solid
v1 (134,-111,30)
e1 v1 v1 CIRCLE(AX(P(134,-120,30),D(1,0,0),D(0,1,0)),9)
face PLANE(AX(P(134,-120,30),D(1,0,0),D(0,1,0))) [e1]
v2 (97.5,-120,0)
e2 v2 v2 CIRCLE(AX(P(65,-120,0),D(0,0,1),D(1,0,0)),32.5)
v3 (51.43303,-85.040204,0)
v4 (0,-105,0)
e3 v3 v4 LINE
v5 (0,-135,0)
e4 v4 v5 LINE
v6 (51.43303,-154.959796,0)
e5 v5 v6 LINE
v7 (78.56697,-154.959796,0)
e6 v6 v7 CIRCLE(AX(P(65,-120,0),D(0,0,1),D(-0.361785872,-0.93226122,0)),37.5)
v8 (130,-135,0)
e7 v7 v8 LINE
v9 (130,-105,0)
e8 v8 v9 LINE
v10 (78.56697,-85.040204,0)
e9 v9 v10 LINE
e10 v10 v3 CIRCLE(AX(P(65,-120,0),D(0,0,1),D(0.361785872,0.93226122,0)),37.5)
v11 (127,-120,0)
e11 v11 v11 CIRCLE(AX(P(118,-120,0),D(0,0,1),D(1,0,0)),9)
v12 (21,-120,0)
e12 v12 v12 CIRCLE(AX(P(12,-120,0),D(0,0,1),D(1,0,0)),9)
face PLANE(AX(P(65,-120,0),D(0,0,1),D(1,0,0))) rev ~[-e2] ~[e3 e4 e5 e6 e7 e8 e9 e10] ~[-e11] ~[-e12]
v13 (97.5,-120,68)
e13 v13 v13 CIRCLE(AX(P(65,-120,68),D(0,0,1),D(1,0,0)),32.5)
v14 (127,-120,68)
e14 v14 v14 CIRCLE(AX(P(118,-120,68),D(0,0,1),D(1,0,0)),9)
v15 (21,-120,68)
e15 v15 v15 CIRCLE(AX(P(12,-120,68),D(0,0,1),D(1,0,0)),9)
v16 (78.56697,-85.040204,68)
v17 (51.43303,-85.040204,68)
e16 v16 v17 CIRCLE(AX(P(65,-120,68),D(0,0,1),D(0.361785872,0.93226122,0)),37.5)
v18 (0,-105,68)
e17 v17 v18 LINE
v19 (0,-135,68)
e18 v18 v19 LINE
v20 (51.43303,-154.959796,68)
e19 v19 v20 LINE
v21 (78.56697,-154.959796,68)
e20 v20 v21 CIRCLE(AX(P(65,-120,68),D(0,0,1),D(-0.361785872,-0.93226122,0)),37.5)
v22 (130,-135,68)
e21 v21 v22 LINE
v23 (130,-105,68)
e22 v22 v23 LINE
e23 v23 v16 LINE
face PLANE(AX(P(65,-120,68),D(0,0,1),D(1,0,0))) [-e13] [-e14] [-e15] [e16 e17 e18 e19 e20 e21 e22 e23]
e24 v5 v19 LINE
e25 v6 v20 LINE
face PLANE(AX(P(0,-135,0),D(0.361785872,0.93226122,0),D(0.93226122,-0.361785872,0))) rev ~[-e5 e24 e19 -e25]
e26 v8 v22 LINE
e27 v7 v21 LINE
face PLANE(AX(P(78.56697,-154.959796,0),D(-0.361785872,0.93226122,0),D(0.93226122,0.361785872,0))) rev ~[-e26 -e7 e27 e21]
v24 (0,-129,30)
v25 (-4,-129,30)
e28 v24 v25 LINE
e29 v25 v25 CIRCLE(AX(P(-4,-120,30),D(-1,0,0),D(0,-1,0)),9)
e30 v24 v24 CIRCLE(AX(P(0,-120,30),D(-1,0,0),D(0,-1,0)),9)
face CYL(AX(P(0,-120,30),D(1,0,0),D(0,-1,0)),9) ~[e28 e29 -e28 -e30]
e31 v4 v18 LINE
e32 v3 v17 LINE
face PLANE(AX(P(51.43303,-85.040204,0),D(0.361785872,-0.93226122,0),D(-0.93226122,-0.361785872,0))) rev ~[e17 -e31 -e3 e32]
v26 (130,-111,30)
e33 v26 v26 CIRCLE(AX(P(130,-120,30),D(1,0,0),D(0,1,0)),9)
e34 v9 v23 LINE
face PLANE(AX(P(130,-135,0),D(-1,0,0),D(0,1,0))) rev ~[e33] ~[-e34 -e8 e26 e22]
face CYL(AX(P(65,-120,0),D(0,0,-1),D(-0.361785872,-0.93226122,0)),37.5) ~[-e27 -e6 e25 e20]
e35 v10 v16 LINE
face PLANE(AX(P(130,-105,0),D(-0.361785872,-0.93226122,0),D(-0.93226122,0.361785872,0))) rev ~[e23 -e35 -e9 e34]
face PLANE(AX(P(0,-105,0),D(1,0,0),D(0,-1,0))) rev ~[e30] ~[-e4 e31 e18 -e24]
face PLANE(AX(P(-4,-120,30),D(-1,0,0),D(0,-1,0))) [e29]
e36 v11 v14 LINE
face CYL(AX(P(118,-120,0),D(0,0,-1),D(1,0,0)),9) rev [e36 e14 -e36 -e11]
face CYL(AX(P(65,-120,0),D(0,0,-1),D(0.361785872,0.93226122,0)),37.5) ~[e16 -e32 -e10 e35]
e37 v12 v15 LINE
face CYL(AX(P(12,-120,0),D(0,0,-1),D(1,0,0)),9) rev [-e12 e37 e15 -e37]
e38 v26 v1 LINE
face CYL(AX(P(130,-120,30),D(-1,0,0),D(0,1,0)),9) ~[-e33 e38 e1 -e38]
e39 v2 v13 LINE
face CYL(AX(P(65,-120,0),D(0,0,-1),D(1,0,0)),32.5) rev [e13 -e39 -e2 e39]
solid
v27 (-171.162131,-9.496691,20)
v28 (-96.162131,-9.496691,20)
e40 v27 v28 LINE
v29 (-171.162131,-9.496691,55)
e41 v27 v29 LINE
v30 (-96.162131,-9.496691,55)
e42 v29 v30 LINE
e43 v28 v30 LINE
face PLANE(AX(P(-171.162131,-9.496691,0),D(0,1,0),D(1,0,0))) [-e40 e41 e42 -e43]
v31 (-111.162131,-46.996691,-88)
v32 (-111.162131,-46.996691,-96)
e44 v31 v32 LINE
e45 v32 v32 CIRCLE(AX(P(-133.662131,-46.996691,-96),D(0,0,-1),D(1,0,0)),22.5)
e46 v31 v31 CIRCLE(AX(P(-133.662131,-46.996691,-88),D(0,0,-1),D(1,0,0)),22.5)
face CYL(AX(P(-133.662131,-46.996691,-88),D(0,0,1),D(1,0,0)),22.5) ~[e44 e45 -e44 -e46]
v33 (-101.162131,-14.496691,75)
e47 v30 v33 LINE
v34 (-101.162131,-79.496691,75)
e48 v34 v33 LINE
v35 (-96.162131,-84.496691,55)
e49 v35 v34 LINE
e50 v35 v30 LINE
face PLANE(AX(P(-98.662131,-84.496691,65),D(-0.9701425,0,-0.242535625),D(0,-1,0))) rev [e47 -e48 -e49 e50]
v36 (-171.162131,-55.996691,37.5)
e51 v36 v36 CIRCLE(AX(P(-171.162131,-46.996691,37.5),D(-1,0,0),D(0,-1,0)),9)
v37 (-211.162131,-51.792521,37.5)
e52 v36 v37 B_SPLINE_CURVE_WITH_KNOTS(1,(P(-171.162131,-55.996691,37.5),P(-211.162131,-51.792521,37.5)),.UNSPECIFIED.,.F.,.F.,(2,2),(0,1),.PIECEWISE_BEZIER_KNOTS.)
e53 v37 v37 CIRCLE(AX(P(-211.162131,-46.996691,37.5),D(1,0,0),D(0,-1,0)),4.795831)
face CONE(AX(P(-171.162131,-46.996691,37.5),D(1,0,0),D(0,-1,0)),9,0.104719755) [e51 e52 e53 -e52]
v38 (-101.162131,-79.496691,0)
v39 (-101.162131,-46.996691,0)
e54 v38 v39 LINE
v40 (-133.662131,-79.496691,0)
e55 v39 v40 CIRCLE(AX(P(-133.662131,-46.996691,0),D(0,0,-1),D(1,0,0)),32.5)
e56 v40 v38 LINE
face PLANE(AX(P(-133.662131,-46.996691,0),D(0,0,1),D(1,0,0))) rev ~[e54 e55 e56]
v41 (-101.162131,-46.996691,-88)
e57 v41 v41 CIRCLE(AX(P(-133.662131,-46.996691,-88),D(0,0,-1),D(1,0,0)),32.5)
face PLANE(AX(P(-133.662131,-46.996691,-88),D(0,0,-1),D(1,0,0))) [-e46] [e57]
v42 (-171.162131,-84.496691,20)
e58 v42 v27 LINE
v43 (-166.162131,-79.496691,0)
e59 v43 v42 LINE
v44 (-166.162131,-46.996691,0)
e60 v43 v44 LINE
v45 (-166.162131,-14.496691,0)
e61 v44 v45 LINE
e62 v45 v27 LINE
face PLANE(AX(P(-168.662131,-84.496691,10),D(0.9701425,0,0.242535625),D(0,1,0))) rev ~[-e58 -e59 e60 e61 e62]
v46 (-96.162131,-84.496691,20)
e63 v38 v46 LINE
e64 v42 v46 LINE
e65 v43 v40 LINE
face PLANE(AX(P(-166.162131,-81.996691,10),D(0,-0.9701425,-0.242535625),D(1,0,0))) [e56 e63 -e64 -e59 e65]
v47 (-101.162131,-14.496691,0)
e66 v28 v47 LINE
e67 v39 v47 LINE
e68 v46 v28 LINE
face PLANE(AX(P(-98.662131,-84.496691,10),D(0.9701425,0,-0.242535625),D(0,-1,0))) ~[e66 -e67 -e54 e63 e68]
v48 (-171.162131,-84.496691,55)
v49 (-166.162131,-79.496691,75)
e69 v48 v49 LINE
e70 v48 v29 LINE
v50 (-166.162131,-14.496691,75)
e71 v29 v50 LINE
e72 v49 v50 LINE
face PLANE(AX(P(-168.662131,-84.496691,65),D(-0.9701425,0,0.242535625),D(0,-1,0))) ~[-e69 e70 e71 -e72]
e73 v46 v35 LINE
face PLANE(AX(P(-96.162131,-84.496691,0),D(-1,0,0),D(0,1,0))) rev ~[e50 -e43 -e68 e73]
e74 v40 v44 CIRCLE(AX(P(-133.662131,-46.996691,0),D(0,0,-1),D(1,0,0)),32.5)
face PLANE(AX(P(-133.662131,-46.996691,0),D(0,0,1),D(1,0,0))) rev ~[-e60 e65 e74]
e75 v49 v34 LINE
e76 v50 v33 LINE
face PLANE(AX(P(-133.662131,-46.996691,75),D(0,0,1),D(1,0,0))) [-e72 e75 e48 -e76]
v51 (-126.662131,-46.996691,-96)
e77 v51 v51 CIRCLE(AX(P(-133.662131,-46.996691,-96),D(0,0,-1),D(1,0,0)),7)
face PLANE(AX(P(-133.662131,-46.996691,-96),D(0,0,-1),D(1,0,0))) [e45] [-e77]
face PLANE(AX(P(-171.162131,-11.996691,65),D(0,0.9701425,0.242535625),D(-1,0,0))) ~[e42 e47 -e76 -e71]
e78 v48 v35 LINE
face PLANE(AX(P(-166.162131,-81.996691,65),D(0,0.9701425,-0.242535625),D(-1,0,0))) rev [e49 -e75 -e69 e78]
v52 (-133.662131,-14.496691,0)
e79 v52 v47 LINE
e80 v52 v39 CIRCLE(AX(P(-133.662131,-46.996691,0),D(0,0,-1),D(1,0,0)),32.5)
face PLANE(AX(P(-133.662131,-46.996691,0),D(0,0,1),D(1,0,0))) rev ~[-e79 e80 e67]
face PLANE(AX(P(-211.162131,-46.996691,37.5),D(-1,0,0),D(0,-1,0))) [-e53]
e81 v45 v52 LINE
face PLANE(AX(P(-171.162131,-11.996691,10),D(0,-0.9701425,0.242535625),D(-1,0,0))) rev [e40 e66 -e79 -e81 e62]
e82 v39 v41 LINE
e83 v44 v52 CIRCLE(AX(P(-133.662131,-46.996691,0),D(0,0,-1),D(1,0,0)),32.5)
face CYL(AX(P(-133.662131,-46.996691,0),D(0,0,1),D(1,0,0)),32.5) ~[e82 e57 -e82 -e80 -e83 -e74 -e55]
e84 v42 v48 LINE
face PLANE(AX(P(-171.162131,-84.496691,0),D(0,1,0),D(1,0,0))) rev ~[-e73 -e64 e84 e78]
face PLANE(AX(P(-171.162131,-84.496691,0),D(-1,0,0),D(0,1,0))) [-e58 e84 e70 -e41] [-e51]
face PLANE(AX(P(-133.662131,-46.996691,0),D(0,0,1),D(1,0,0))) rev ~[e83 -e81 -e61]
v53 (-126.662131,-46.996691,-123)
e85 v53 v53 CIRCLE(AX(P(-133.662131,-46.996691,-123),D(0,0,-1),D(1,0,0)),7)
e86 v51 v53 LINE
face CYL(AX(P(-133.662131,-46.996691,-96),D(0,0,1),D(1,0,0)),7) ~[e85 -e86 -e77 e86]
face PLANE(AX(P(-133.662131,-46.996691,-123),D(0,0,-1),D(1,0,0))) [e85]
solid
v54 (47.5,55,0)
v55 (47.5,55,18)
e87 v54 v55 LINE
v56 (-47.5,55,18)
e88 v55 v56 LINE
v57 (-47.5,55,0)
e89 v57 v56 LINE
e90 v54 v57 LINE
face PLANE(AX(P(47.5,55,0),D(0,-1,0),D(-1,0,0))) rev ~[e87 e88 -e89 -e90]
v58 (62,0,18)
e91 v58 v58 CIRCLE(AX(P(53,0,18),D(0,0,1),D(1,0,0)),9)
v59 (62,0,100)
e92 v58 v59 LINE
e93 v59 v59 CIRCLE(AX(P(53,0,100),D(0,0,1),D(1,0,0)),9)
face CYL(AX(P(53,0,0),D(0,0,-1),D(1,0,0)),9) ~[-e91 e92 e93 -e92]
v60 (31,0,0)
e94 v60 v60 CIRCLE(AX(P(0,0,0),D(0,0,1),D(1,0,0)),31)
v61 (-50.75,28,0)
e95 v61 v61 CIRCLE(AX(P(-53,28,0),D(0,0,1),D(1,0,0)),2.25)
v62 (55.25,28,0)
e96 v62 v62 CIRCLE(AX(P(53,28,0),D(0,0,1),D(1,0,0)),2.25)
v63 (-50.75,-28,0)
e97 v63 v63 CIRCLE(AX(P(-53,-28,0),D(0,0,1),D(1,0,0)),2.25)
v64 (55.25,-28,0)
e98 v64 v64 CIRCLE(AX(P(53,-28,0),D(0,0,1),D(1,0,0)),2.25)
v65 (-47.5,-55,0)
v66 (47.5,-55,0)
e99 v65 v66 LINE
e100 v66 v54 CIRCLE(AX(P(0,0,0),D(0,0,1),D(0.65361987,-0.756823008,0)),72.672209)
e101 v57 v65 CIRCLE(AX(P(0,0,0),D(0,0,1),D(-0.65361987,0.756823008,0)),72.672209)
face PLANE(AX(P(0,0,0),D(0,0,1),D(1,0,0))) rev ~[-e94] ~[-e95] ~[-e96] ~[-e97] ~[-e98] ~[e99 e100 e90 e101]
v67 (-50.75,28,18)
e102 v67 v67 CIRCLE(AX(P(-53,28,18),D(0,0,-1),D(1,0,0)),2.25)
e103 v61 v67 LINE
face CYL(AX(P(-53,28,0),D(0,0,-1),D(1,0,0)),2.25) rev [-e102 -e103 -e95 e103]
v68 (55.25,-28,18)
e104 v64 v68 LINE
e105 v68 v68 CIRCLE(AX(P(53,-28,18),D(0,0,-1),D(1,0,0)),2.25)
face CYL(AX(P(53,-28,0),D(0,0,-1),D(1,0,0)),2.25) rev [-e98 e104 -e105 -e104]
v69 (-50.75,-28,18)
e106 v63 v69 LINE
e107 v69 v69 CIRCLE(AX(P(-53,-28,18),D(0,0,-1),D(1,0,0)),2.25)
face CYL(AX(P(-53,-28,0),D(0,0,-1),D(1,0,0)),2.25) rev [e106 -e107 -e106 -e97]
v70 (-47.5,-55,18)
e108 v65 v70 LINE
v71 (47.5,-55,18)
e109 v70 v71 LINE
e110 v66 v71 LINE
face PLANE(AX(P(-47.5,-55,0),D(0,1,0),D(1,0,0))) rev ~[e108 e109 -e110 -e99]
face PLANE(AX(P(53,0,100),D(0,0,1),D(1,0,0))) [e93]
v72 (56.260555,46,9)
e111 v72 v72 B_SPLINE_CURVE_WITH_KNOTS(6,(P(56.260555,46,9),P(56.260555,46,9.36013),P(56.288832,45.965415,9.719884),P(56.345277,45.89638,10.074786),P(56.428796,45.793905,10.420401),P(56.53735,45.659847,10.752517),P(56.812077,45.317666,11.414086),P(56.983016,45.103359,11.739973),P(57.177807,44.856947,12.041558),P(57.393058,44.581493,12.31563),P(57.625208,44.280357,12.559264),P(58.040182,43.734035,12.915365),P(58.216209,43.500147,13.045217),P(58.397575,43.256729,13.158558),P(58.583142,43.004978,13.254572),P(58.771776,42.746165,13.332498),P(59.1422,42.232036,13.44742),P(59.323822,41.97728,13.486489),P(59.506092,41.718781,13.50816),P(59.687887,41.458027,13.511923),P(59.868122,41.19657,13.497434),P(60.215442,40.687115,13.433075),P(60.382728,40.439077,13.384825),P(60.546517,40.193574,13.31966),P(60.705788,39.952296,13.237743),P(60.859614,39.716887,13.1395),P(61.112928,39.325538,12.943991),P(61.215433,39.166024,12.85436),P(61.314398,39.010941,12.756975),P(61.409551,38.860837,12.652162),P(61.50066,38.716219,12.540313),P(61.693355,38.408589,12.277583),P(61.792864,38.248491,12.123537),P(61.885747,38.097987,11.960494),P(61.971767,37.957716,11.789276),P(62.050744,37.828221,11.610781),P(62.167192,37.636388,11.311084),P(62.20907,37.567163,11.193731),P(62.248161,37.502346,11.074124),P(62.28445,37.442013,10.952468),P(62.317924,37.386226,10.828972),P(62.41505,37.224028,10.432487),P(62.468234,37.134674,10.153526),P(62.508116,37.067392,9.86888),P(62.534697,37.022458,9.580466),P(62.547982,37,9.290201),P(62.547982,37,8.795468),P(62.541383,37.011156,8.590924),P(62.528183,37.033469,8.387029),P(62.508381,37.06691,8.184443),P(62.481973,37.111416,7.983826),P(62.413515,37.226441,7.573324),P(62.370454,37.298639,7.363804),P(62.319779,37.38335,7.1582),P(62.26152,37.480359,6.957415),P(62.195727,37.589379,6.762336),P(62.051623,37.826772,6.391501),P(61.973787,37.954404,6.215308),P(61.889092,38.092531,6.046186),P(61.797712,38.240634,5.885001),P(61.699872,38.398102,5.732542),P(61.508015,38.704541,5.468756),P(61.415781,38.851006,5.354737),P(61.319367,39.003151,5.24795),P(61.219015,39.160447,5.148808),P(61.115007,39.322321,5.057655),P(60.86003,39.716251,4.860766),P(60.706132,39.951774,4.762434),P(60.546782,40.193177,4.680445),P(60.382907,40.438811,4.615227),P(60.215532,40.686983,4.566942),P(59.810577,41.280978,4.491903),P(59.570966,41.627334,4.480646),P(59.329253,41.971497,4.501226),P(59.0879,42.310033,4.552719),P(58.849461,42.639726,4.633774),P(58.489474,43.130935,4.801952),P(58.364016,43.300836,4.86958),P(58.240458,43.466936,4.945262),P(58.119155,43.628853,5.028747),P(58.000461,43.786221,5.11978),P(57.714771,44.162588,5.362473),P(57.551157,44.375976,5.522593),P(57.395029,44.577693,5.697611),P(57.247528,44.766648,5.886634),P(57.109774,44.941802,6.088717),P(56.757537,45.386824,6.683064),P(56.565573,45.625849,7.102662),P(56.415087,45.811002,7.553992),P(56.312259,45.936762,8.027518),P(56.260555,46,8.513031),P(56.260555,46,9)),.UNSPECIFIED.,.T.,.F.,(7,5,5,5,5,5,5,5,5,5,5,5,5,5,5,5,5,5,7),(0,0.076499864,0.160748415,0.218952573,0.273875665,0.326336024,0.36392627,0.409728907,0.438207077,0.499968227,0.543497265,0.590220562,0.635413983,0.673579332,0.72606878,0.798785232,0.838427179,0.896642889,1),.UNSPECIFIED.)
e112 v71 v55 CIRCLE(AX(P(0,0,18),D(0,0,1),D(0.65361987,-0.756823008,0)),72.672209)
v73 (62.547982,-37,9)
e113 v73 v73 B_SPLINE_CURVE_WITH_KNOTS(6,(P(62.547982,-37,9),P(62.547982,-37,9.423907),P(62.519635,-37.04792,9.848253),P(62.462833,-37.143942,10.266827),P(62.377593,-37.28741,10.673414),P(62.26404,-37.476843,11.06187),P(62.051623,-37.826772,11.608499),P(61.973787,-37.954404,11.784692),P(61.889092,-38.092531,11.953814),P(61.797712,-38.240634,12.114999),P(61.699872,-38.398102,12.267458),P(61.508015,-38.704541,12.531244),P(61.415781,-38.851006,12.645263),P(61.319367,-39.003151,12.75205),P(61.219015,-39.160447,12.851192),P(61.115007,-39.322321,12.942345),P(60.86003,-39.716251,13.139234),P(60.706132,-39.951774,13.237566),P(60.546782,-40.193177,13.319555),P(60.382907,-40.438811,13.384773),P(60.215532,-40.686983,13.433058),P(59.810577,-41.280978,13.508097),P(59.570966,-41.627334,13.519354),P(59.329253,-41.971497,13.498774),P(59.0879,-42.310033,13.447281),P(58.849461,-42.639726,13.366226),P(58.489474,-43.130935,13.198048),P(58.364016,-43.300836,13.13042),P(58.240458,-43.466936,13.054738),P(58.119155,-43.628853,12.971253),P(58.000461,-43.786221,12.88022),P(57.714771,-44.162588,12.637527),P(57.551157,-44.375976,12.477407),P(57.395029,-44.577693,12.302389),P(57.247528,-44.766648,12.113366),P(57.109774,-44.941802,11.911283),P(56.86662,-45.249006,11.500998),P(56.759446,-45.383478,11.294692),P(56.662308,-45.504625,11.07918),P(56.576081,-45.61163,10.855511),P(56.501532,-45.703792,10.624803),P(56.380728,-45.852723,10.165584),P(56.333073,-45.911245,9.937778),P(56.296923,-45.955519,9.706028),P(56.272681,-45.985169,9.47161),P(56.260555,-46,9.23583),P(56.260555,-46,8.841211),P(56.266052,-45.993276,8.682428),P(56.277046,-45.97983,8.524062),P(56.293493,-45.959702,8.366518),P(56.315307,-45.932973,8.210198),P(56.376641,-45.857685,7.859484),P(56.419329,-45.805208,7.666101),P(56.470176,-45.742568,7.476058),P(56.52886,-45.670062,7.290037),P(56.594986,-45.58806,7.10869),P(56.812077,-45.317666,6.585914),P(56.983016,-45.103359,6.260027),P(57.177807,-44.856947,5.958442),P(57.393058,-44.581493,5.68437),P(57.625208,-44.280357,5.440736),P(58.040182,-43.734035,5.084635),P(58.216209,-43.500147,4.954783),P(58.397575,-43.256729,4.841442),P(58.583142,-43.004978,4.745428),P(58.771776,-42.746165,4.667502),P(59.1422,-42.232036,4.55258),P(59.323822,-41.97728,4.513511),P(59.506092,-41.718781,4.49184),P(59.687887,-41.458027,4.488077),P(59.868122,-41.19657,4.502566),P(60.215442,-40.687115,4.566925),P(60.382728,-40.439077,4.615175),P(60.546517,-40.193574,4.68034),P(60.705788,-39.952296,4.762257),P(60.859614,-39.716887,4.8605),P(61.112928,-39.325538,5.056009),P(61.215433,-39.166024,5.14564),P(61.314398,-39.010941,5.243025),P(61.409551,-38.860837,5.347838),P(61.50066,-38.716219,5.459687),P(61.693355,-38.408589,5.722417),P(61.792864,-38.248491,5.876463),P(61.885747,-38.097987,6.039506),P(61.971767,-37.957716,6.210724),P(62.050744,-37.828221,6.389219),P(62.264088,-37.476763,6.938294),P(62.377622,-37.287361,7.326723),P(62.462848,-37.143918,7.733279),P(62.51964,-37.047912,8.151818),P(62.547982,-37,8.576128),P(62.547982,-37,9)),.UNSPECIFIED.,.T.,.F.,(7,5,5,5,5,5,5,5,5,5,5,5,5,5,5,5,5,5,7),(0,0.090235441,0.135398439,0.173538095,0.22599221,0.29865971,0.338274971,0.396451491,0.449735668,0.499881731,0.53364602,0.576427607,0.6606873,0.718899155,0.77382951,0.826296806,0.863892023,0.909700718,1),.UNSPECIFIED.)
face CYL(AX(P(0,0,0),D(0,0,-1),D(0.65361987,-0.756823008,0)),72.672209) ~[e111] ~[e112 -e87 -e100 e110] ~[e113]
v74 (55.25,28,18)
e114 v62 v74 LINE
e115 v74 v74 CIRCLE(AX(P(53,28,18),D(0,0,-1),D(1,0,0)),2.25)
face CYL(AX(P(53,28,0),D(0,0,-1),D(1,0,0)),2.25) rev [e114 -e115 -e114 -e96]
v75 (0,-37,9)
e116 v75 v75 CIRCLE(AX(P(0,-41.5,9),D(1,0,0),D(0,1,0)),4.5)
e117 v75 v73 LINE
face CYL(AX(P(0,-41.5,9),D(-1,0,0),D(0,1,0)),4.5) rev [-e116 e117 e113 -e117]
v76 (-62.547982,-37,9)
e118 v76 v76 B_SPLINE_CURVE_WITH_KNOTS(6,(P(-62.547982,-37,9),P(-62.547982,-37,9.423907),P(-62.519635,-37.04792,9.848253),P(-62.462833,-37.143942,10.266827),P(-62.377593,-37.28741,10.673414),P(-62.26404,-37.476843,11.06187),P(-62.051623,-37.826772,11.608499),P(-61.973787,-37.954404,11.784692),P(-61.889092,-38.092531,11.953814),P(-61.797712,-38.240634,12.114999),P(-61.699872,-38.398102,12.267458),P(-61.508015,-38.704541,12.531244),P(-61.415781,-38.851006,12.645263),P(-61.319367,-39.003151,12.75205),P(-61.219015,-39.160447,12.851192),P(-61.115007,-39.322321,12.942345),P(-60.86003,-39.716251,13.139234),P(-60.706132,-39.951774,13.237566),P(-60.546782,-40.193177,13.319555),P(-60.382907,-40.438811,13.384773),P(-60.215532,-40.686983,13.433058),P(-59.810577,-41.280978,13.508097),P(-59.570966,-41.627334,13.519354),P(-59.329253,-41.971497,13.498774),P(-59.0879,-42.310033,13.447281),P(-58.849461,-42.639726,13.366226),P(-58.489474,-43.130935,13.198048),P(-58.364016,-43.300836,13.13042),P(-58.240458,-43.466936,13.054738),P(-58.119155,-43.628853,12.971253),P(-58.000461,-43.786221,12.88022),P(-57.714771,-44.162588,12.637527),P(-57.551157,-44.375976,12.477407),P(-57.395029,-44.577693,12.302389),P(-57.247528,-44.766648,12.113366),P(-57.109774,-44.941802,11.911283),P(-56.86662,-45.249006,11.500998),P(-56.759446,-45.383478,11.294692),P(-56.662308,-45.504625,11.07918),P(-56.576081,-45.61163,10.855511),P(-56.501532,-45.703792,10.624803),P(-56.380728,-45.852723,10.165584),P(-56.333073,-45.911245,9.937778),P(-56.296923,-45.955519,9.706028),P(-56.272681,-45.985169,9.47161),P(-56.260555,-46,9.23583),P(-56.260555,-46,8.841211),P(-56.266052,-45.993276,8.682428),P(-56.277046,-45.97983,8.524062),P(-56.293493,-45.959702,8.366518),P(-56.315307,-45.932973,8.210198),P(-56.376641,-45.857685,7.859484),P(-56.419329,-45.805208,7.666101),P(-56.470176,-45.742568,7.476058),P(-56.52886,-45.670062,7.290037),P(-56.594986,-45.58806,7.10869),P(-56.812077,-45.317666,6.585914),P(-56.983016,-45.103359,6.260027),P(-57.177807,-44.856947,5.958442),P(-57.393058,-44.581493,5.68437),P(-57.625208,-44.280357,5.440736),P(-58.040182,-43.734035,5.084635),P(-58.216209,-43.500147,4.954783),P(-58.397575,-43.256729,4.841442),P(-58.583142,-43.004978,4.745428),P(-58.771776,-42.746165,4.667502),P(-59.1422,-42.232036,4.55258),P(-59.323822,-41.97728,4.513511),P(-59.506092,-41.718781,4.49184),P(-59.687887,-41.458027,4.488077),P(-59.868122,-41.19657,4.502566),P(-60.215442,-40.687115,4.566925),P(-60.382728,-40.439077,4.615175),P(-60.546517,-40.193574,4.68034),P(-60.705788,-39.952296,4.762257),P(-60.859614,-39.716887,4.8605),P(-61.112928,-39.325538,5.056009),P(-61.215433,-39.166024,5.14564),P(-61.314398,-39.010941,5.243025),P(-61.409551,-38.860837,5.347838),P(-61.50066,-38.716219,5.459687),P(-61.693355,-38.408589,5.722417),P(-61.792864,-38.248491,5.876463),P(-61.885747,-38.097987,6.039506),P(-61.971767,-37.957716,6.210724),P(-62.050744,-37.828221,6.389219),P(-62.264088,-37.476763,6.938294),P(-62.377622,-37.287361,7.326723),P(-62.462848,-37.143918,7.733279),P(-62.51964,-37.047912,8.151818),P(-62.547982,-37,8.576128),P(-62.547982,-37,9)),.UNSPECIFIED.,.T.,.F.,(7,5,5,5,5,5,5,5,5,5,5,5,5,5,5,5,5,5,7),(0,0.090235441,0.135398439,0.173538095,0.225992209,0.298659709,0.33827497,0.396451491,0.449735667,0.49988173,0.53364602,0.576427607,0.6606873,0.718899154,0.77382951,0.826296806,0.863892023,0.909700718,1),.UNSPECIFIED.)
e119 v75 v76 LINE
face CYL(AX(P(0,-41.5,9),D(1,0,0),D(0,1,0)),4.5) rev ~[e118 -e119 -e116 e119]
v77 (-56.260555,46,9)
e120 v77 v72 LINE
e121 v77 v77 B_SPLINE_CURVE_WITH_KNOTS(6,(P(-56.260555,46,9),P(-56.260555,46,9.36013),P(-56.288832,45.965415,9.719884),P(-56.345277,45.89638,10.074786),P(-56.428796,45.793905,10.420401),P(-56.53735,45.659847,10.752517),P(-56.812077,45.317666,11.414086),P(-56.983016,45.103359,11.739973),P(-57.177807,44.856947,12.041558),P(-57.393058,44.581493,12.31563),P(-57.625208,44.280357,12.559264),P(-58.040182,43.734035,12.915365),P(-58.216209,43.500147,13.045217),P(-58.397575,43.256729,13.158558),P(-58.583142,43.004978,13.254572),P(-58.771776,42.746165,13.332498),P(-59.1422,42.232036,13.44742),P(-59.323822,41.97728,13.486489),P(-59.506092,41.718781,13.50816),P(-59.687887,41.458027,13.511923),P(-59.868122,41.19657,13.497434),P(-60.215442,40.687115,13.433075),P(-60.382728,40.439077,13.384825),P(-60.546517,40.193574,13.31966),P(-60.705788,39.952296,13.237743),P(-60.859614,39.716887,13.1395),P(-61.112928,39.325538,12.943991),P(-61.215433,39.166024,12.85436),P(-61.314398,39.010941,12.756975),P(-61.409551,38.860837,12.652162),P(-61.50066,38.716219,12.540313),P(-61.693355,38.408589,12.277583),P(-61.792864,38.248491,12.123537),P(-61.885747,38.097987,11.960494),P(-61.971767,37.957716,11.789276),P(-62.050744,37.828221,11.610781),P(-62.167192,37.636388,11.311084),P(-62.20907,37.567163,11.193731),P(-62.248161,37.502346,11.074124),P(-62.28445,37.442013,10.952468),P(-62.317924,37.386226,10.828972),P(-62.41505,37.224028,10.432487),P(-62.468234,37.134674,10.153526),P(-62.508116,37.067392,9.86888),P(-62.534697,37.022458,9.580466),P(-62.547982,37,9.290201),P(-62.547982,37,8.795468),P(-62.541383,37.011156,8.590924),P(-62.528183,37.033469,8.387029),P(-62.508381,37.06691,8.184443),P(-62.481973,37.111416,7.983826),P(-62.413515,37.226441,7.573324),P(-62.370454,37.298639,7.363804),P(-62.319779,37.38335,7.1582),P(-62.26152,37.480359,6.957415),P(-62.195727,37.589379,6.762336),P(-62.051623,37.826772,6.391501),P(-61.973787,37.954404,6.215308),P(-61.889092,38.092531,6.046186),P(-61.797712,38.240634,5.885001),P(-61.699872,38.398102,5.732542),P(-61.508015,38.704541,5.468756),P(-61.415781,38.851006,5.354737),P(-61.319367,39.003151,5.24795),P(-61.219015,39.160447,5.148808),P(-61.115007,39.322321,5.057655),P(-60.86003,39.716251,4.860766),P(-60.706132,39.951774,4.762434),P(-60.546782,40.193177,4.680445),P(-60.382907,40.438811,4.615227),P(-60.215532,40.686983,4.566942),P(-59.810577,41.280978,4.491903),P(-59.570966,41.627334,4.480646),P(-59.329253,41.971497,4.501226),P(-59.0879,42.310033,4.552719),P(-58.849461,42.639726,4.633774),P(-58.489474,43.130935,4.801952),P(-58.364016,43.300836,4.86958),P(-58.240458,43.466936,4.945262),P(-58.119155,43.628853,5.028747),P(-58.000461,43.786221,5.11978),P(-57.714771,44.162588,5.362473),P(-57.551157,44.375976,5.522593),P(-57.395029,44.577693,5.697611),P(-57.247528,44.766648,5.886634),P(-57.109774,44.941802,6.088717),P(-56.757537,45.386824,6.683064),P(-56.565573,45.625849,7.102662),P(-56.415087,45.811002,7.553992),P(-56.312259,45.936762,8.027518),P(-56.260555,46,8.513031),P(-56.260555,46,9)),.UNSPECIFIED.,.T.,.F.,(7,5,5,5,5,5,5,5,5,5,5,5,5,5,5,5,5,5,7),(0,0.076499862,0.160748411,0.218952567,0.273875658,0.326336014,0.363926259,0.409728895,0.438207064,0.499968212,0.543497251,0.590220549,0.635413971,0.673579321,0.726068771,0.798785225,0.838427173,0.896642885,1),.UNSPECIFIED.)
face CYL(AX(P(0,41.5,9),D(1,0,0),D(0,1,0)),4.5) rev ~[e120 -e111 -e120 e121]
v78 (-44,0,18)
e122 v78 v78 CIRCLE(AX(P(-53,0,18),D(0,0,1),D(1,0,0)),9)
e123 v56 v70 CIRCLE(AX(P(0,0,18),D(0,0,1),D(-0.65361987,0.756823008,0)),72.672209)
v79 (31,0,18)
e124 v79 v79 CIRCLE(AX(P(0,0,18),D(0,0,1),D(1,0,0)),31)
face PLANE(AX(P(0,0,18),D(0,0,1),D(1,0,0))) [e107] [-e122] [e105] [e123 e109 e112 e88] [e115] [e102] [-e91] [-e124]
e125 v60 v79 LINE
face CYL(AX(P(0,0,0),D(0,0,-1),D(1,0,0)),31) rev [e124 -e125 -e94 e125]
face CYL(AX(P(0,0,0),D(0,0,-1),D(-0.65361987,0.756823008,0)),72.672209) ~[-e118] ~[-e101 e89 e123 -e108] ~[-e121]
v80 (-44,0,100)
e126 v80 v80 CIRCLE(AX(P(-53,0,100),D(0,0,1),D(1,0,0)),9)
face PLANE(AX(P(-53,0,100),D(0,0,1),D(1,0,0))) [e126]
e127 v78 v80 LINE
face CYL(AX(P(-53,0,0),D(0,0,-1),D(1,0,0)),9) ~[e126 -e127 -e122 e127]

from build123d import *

# Parameters (mm, degrees)
F0_R         = 9
F0_R_2       = 31
F1_DEPTH     = 18
F2_DEPTH     = 100
F3_R         = 4.5
F4_DEPTH     = 100
F5_R         = 9
F5_R_2       = 32.5
F6_DEPTH     = 68
F7_R         = 9
F8_DEPTH     = 4
F9_R         = 9
F10_DEPTH    = 4
F16_W        = 75
F16_H        = 75
F17_DEPTH    = 75
F18_SIZE2    = 5
F18_SIZE     = 20
F19_C1_SIZE2 = 5
F19_C1_SIZE  = 20
F19_C2_SIZE2 = 5
F19_C2_SIZE  = 20
F19_C3_SIZE2 = 5
F19_C3_SIZE  = 20
F19_C4_SIZE2 = 20
F19_C4_SIZE  = 5
F19_C5_SIZE2 = 20
F19_C5_SIZE  = 5
F19_C6_SIZE2 = 5
F19_C6_SIZE  = 20
F19_C7_SIZE2 = 5
F19_C7_SIZE  = 20
F20_R        = 9
F21_DEPTH    = 40
F21_TAPER    = 6
F22_R        = 32.5
F23_DEPTH    = 88
F24_R        = 22.5
F25_DEPTH    = 8
F26_R        = 7
F27_DEPTH    = 27
F28_R        = 2.25
F29_DEPTH    = 25


# Not quite as in the source:
# - a feature of the source that left no trace in its solid (it failed there, or was rolled back) is left out


with BuildPart() as f1:
    # F0 (on Top) → F1 (new body)
    with BuildSketch(Plane.XY):
        with BuildLine():
            Line((47.5, 55), (-47.5, 55))
            ThreePointArc((-47.5, 55), (-72.6722092687, 0), (-47.5, -55))
            Line((-47.5, -55), (47.5, -55))
            ThreePointArc((47.5, -55), (72.6722092687, 0), (47.5, 55))
        make_face()
        with Locations((-53, 0)):
            Circle(F0_R, mode=Mode.SUBTRACT)
        Circle(F0_R_2, mode=Mode.SUBTRACT)
        with Locations((53, 0)):
            Circle(F0_R, mode=Mode.SUBTRACT)
    extrude(amount=F1_DEPTH)

    # F0 (on Top) → F2 (join)
    with BuildSketch(Plane.XY):
        with Locations((-53, 0)):
            Circle(F0_R)
        with Locations((53, 0)):
            Circle(F0_R)
    extrude(amount=F2_DEPTH)

    # F3 (on Right) → F4 (cut, symmetric)
    with BuildSketch(Plane.YZ):
        with Locations((-41.5, 9)):
            Circle(F3_R)
        with Locations((41.5, 9)):
            Circle(F3_R)
    extrude(amount=F4_DEPTH, both=True, mode=Mode.SUBTRACT)

    # F28 (on face) → F29 (cut)
    with BuildSketch(Plane.XY):
        with Locations((-53, 28)):
            Circle(F28_R)
        with Locations((-53, -28)):
            Circle(F28_R)
        with Locations((53, -28)):
            Circle(F28_R)
        with Locations((53, 28)):
            Circle(F28_R)
    extrude(amount=F29_DEPTH, mode=Mode.SUBTRACT)


with BuildPart() as f6:
    # F5 (on Top) → F6 (new body)
    with BuildSketch(Plane.XY):
        with BuildLine():
            Line((0, -105), (0, -135))
            Line((0, -135), (51.4330297899, -154.9597957562))
            ThreePointArc((51.4330297899, -154.9597957562), (65, -157.5), (78.5669702101, -154.9597957562))
            Line((78.5669702101, -154.9597957562), (130, -135))
            Line((130, -135), (130, -105))
            Line((130, -105), (78.5669702101, -85.0402042438))
            ThreePointArc((78.5669702101, -85.0402042438), (65, -82.5), (51.4330297899, -85.0402042438))
            Line((51.4330297899, -85.0402042438), (0, -105))
        make_face()
        with Locations((12, -120)):
            Circle(F5_R, mode=Mode.SUBTRACT)
        with Locations((65, -120)):
            Circle(F5_R_2, mode=Mode.SUBTRACT)
        with Locations((118, -120)):
            Circle(F5_R, mode=Mode.SUBTRACT)
    extrude(amount=F6_DEPTH)

    # F7 (on face) → F8 (join)
    with BuildSketch(Plane.YZ.offset(130)):
        with Locations((-120, 30)):
            Circle(F7_R)
    extrude(amount=F8_DEPTH)

    # F9 (on face) → F10 (join)
    with BuildSketch(Plane(origin=(0, 0, 0), x_dir=(0, -1, 0), z_dir=(-1, 0, 0))):
        with Locations((120, 30)):
            Circle(F9_R)
    extrude(amount=F10_DEPTH)


with BuildPart() as f17:
    # F16 (on Top) → F17 (new body)
    with BuildSketch(Plane.XY):
        with Locations((-133.6621306837, -46.9966906275)):
            Rectangle(F16_W, F16_H)
    extrude(amount=F17_DEPTH)

    # F18
    f18_edges = [f17.edges().sort_by_distance(p)[0] for p in [
        (-96.162131, -46.996691, 75),
    ]]
    f18_side = f17.faces().sort_by_distance((-96.162131, -46.996691, 37.5))[0]
    chamfer(f18_edges, length=F18_SIZE, length2=F18_SIZE2, reference=f18_side)

    # F19: chamfer of 20 x 5 on 7 edges, made by hand

    # F19_c1
    f19_c1_edges = [f17.edges().sort_by_distance(p)[0] for p in [
        (-133.6621306837, -9.4966906275, 0),
    ]]
    f19_c1_side = f17.faces().sort_by_distance((-133.6621306837, -9.4966906275, 0.1))[0]
    chamfer(f19_c1_edges, length=F19_C1_SIZE, length2=F19_C1_SIZE2, reference=f19_c1_side)

    # F19_c2
    f19_c2_edges = [f17.edges().sort_by_distance(p)[0] for p in [
        (-136.1621306837, -9.4966906275, 75),
    ]]
    f19_c2_side = f17.faces().sort_by_distance((-136.1621306837, -9.4966906275, 74.9))[0]
    chamfer(f19_c2_edges, length=F19_C2_SIZE, length2=F19_C2_SIZE2, reference=f19_c2_side)

    # F19_c3
    f19_c3_edges = [f17.edges().sort_by_distance(p)[0] for p in [
        (-96.1621306837, -49.4966906275, 0),
    ]]
    f19_c3_side = f17.faces().sort_by_distance((-96.1621306837, -49.4966906275, 0.1))[0]
    chamfer(f19_c3_edges, length=F19_C3_SIZE, length2=F19_C3_SIZE2, reference=f19_c3_side)

    # F19_c4
    f19_c4_edges = [f17.edges().sort_by_distance(p)[0] for p in [
        (-171.1621306837, -49.4966906275, 0),
    ]]
    f19_c4_side = f17.faces().sort_by_distance((-171.0621306837, -49.4966906275, 0))[0]
    chamfer(f19_c4_edges, length=F19_C4_SIZE, length2=F19_C4_SIZE2, reference=f19_c4_side)

    # F19_c5
    f19_c5_edges = [f17.edges().sort_by_distance(p)[0] for p in [
        (-133.6621306837, -84.4966906275, 0),
    ]]
    f19_c5_side = f17.faces().sort_by_distance((-133.6621306837, -84.3966906275, 0))[0]
    chamfer(f19_c5_edges, length=F19_C5_SIZE, length2=F19_C5_SIZE2, reference=f19_c5_side)

    # F19_c6
    f19_c6_edges = [f17.edges().sort_by_distance(p)[0] for p in [
        (-171.1621306837, -49.4966906275, 75),
    ]]
    f19_c6_side = f17.faces().sort_by_distance((-171.1621306837, -49.4966906275, 74.9))[0]
    chamfer(f19_c6_edges, length=F19_C6_SIZE, length2=F19_C6_SIZE2, reference=f19_c6_side)

    # F19_c7
    f19_c7_edges = [f17.edges().sort_by_distance(p)[0] for p in [
        (-133.6621306837, -84.4966906275, 75),
    ]]
    f19_c7_side = f17.faces().sort_by_distance((-133.6621306837, -84.4966906275, 74.9))[0]
    chamfer(f19_c7_edges, length=F19_C7_SIZE, length2=F19_C7_SIZE2, reference=f19_c7_side)

    # F20 (on face) → F21 (join)
    with BuildSketch(Plane(origin=(-171.1621306837, 0, 0), x_dir=(0, -1, 0), z_dir=(-1, 0, 0))):
        with Locations((46.9966906275, 37.5)):
            Circle(F20_R)
    extrude(amount=F21_DEPTH, taper=F21_TAPER)

    # F22 (on face) → F23 (join)
    with BuildSketch(Plane(origin=(0, 0, 0), x_dir=(1, 0, 0), z_dir=(0, 0, -1))):
        with Locations((-133.6621306837, 46.9966906275)):
            Circle(F22_R)
    extrude(amount=F23_DEPTH)

    # F24 (on face) → F25 (join)
    with BuildSketch(Plane(origin=(0, 0, -88), x_dir=(1, 0, 0), z_dir=(0, 0, -1))):
        with Locations((-133.6621306837, 46.9966906275)):
            Circle(F24_R)
    extrude(amount=F25_DEPTH)

    # F26 (on face) → F27 (join)
    with BuildSketch(Plane(origin=(0, 0, -96), x_dir=(1, 0, 0), z_dir=(0, 0, -1))):
        with Locations((-133.6621306837, 46.9966906275)):
            Circle(F26_R)
    extrude(amount=F27_DEPTH)


solid = Compound([f1.part, f6.part, f17.part])
